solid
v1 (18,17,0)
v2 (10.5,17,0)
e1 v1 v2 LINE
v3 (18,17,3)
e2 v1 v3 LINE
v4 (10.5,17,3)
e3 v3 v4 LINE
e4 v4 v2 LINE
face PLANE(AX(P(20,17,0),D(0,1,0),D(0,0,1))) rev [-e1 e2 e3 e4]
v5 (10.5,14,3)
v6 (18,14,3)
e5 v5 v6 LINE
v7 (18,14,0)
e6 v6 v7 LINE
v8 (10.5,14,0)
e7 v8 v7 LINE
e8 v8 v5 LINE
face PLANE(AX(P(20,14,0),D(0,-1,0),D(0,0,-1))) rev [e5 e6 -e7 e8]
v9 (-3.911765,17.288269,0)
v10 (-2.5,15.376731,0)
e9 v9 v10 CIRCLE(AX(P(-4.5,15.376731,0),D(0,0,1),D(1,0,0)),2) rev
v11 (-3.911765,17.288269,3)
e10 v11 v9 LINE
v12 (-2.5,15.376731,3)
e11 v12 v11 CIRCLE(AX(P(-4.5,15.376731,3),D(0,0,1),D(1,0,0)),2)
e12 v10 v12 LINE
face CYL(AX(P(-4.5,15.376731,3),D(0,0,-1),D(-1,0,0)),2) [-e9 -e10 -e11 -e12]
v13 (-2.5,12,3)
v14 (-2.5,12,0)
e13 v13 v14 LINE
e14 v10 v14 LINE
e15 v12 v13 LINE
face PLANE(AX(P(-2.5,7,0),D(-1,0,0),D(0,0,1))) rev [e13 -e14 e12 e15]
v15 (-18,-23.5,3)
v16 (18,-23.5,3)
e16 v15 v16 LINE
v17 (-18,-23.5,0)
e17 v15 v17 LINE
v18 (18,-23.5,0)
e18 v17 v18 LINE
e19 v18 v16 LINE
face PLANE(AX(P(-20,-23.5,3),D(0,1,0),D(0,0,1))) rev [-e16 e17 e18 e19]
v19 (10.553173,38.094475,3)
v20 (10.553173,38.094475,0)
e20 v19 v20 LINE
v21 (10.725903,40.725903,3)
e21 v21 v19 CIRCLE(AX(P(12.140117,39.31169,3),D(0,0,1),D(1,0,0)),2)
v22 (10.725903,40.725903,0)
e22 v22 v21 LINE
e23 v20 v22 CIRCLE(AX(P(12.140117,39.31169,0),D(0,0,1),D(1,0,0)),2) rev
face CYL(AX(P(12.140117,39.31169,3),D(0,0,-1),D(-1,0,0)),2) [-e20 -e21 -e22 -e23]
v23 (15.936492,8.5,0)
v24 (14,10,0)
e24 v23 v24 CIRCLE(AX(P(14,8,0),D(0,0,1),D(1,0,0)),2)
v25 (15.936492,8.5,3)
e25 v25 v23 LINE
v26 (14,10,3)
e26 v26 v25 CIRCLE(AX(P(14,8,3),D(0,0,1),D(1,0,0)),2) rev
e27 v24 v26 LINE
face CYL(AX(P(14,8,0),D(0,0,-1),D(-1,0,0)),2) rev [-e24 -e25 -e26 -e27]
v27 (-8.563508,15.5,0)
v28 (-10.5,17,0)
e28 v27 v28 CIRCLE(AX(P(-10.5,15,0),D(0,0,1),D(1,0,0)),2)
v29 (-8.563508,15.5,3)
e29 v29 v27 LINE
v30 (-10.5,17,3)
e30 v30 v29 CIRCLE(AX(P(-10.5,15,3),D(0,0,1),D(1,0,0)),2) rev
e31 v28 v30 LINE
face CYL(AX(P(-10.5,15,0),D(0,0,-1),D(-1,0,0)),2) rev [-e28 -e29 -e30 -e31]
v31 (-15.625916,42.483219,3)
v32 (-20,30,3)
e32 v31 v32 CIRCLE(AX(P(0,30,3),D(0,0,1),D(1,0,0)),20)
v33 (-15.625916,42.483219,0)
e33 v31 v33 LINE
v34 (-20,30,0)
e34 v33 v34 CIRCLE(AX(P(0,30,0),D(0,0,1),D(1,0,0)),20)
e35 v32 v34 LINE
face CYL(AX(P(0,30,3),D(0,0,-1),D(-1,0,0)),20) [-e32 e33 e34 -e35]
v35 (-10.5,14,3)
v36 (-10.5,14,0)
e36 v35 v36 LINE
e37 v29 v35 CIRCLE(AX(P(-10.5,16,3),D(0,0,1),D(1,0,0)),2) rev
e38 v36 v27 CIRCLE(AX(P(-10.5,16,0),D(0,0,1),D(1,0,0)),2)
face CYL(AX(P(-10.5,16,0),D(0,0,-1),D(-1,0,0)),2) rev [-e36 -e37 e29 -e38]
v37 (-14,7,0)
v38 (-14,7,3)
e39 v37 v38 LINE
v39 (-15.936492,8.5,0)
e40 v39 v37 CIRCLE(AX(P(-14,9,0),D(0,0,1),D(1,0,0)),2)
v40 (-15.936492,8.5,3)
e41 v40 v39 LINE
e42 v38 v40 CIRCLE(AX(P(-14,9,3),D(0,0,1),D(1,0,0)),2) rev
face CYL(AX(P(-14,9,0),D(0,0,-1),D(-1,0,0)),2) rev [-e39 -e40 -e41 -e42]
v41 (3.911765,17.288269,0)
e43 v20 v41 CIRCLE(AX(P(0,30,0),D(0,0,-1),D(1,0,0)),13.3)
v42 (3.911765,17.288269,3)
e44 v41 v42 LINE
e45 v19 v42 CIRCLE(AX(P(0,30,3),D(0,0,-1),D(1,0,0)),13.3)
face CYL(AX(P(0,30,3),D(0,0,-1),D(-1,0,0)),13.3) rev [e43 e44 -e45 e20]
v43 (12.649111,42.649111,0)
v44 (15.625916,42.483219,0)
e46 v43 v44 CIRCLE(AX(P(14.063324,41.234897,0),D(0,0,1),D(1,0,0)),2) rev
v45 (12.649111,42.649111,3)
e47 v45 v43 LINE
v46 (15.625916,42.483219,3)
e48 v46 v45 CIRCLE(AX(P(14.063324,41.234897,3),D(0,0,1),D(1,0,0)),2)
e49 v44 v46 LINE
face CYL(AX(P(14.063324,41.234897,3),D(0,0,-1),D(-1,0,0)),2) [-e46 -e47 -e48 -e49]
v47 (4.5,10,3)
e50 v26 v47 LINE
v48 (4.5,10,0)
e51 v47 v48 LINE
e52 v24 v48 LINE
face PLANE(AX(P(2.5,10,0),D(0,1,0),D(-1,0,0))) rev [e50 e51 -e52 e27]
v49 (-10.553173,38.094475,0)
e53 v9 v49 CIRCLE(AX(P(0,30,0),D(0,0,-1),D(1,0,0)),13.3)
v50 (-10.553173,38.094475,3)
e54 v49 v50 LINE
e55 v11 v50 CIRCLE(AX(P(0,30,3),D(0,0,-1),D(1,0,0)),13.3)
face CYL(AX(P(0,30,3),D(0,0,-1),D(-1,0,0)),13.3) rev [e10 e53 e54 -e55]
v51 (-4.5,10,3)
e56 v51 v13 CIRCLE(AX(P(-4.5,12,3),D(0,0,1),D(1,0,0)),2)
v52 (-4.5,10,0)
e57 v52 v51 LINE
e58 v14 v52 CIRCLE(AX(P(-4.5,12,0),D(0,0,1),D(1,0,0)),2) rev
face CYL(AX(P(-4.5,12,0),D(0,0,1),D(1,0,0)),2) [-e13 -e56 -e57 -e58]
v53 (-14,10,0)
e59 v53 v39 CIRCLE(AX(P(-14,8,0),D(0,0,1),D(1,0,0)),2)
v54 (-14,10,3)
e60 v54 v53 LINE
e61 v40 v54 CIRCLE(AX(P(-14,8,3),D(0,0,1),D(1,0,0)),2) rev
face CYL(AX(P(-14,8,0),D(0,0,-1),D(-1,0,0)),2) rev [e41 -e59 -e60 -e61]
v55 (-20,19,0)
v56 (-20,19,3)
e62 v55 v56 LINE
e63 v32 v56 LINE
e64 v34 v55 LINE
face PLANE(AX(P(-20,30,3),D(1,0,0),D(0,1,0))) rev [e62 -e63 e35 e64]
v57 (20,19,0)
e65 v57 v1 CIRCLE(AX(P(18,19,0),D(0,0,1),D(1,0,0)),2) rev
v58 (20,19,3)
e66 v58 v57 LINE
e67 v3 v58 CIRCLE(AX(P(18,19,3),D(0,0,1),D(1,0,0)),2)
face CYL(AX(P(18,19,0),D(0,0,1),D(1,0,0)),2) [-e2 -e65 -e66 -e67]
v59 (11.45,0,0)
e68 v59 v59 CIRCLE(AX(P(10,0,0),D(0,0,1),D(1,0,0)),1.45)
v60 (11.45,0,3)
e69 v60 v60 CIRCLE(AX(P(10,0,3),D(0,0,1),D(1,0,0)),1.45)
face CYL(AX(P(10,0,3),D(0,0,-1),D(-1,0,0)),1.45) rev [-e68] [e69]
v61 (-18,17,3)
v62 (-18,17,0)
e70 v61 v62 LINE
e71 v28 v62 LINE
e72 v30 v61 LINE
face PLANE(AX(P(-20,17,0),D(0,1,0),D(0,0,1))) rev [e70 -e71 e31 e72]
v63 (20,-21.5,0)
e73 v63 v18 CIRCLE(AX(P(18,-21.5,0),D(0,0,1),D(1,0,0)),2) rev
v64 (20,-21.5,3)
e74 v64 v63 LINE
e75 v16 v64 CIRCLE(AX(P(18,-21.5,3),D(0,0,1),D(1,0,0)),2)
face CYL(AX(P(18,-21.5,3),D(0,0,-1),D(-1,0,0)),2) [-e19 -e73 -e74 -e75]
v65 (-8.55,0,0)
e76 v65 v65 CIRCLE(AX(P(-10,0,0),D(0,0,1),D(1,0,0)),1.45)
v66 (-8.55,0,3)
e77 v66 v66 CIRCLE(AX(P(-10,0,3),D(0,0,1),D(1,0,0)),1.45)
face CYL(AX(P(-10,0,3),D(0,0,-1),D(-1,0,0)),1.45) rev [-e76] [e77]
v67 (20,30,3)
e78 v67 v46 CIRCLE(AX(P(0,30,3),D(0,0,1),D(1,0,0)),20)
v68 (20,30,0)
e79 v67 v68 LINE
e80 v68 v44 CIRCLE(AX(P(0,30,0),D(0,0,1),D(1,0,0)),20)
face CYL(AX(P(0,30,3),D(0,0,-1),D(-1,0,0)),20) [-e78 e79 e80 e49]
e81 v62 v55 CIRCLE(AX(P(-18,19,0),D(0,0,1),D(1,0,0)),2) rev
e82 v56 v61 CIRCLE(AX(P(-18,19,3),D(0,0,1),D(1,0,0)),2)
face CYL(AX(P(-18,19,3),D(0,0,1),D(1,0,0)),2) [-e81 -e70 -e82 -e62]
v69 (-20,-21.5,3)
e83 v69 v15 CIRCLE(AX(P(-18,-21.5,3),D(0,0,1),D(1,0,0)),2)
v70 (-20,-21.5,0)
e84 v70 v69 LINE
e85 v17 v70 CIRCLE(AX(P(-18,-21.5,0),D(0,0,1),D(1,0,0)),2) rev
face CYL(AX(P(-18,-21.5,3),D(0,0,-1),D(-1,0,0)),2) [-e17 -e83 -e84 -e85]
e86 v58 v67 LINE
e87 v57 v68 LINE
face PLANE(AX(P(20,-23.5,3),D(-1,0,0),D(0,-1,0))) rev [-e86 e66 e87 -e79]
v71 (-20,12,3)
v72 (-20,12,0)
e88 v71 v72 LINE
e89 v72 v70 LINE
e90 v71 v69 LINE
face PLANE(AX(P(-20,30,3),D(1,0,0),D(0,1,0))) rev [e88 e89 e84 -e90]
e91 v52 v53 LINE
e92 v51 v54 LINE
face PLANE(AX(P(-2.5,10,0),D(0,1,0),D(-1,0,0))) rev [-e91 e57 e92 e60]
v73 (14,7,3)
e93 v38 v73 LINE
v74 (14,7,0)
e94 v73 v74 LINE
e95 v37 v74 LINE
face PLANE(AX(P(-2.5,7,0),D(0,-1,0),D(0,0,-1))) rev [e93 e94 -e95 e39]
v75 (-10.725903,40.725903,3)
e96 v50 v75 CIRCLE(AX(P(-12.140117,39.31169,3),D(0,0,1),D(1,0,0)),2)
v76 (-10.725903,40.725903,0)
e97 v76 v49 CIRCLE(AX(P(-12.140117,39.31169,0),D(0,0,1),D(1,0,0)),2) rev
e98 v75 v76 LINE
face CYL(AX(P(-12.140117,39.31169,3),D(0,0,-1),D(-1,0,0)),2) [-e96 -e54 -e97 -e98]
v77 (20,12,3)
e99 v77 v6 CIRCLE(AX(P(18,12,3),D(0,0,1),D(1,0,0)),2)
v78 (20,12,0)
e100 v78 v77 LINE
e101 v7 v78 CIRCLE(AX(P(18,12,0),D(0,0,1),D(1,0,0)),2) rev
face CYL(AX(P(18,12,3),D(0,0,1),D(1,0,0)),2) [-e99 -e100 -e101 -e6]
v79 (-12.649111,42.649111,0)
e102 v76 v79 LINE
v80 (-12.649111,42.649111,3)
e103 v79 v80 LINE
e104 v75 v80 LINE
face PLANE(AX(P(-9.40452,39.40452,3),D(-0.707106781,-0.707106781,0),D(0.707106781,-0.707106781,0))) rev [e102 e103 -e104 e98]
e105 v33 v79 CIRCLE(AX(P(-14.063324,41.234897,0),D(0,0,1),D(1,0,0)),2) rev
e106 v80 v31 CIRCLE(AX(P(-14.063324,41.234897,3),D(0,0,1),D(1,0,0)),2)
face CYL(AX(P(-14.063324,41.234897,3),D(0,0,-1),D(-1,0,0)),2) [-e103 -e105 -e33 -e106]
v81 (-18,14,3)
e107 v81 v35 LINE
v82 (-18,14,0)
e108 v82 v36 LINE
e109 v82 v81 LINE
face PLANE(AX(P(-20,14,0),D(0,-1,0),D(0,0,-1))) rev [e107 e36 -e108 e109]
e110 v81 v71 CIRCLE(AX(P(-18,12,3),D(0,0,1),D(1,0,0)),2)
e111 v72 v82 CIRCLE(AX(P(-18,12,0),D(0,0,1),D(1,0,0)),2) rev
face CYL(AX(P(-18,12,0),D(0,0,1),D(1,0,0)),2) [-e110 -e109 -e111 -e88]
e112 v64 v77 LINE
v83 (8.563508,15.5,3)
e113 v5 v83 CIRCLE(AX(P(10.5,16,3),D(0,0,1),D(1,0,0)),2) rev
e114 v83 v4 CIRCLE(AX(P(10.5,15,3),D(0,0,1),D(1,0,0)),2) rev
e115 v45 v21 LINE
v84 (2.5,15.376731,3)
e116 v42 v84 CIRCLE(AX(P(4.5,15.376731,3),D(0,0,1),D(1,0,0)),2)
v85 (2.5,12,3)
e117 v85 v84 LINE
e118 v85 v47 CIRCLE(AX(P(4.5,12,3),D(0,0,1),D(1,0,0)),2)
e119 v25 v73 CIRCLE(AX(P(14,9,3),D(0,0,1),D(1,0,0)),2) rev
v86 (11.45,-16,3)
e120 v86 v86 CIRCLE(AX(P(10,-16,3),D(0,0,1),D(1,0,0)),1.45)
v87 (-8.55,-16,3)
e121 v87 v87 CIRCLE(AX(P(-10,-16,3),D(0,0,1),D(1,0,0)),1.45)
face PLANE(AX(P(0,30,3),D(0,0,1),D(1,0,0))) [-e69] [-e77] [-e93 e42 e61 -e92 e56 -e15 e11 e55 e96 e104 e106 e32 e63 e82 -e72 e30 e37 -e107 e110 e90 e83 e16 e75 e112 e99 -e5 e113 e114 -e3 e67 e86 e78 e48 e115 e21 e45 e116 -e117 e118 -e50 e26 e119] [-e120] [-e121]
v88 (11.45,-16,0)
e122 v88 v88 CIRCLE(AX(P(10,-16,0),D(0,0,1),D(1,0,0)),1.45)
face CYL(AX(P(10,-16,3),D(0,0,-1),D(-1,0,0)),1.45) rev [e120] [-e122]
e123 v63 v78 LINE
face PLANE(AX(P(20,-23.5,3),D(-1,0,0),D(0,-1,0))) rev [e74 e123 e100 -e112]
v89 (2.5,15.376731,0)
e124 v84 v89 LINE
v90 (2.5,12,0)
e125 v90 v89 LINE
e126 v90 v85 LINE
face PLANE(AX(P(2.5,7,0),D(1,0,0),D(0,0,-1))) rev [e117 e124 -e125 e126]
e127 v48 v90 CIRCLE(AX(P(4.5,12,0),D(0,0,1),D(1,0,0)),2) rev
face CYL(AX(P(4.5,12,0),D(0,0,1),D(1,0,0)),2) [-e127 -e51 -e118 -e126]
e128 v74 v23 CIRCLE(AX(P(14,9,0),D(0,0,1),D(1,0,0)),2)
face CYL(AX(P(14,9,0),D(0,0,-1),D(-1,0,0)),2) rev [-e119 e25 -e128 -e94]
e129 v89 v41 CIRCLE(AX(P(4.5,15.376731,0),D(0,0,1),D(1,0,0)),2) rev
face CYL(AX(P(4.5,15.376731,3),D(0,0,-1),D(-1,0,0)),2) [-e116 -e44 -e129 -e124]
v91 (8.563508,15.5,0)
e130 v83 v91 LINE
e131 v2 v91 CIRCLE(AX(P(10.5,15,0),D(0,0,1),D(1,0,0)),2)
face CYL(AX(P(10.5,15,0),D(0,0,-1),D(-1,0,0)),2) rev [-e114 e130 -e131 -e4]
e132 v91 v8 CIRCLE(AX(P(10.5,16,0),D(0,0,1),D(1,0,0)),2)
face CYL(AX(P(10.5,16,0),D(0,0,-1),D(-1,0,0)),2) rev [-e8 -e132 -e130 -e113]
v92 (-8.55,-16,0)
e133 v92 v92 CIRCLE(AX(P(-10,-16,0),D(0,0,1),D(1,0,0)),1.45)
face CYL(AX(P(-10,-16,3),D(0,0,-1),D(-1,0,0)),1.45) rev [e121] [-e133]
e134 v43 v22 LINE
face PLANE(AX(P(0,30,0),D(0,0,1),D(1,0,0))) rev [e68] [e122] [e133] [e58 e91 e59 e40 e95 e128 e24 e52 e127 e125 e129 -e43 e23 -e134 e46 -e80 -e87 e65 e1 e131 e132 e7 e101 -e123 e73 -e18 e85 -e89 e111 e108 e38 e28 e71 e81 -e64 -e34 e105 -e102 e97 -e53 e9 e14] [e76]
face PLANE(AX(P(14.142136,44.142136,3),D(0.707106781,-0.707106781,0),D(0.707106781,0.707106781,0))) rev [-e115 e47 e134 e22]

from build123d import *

# Parameters (mm, degrees)
SKETCH_1_R          = 1.45
EXTRUDE_1_DEPTH     = 3
SKETCH_2_W          = 5
SKETCH_2_H          = 25
CUT_EXTRUDE_1_DEPTH = 49.554383298
SKETCH_3_W          = 11.5
SKETCH_3_H          = 3
SKETCH_3_W_2        = 13.5
CUT_EXTRUDE_2_DEPTH = 49.554383298
FILLET_1_R          = 2


with BuildPart() as part:
    # 草图1 → 凸台-拉伸1 (new body)
    with BuildSketch(Plane.XY):
        with BuildLine():
            Line((-9.40452019, 39.40452019), (-14.142135624, 44.142135624))
            ThreePointArc((-14.142135624, 44.142135624), (-18.47759065, 37.653668647), (-20, 30))
            Line((-20, 30), (-20, -23.5))
            Line((-20, -23.5), (20, -23.5))
            Line((20, -23.5), (20, 30))
            ThreePointArc((20, 30), (18.47759065, 37.653668647), (14.142135624, 44.142135624))
            Line((14.142135624, 44.142135624), (9.40452019, 39.40452019))
            ThreePointArc((9.40452019, 39.40452019), (0, 16.7), (-9.40452019, 39.40452019))
        make_face()
        with Locations((-10, 0)):
            Circle(SKETCH_1_R, mode=Mode.SUBTRACT)
        with Locations((10, 0)):
            Circle(SKETCH_1_R, mode=Mode.SUBTRACT)
        with Locations((-10, -16)):
            Circle(SKETCH_1_R, mode=Mode.SUBTRACT)
        with Locations((10, -16)):
            Circle(SKETCH_1_R, mode=Mode.SUBTRACT)
    extrude(amount=EXTRUDE_1_DEPTH)

    # 草图2 → 切除-拉伸1 (cut, through all)
    with BuildSketch(Plane.XY.offset(3)):
        with Locations((0, 19.5)):
            Rectangle(SKETCH_2_W, SKETCH_2_H)
    extrude(amount=-CUT_EXTRUDE_1_DEPTH, mode=Mode.SUBTRACT)

    # 草图3 → 切除-拉伸2 (cut, through all)
    with BuildSketch(Plane.XY.offset(3)):
        with Locations((-14.25, 15.5)):
            Rectangle(SKETCH_3_W, SKETCH_3_H)
        with Locations((-9.25, 8.5)):
            Rectangle(SKETCH_3_W_2, SKETCH_3_H)
        with Locations((9.25, 8.5)):
            Rectangle(SKETCH_3_W_2, SKETCH_3_H)
        with Locations((14.25, 15.5)):
            Rectangle(SKETCH_3_W, SKETCH_3_H)
    extrude(amount=-CUT_EXTRUDE_2_DEPTH, mode=Mode.SUBTRACT)

    # 圆角1
    # the kernel refuses this fillet: 2 mm, written as the material it adds along each edge
    with BuildSketch(Plane(origin=(8.5, 17, 3), x_dir=(1, 0, 0), z_dir=(0, 0, -1)), Plane(origin=(8.5, 14, 3), x_dir=(0, 1, 0), z_dir=(0, 0, -1)), Plane(origin=(-8.5, 14, 3), x_dir=(-1, 0, 0), z_dir=(0, 0, -1)), Plane(origin=(-8.5, 17, 3), x_dir=(0, -1, 0), z_dir=(0, 0, -1)), Plane(origin=(-16, 10, 3), x_dir=(1, 0, 0), z_dir=(0, 0, -1)), Plane(origin=(-16, 7, 3), x_dir=(0, 1, 0), z_dir=(0, 0, -1)), Plane(origin=(16, 7, 3), x_dir=(-1, 0, 0), z_dir=(0, 0, -1)), Plane(origin=(16, 10, 3), x_dir=(0, -1, 0), z_dir=(0, 0, -1))) as fillet_1_piece_1:
        with BuildLine():
            CenterArc((FILLET_1_R, FILLET_1_R), FILLET_1_R, 180, 90)
            Line((0, FILLET_1_R), (0, 0))
            Line((0, 0), (FILLET_1_R, 0))
        make_face()
    extrude(amount=3)
    # the kernel refuses this fillet: 2 mm, written as the material it takes off along each edge
    with BuildSketch(Plane(origin=(20, 14, 8), x_dir=(0, -1, 0), z_dir=(0, 0, -1)), Plane(origin=(-20, 14, 8), x_dir=(1, 0, 0), z_dir=(0, 0, -1)), Plane(origin=(-20, 17, 8), x_dir=(0, 1, 0), z_dir=(0, 0, -1)), Plane(origin=(-2.5, 10, 8), x_dir=(-1, 0, 0), z_dir=(0, 0, -1)), Plane(origin=(2.5, 10, 8), x_dir=(0, 1, 0), z_dir=(0, 0, -1)), Plane(origin=(20, 17, 8), x_dir=(-1, 0, 0), z_dir=(0, 0, -1))) as fillet_1_2_piece_1:
        with BuildLine():
            CenterArc((FILLET_1_R, FILLET_1_R), FILLET_1_R, 180, 90)
            Line((0, FILLET_1_R), (0, 0))
            Line((0, 0), (FILLET_1_R, 0))
        make_face()
    extrude(amount=13, mode=Mode.SUBTRACT)
    with BuildSketch(Plane(origin=(20, -23.5, -5), x_dir=(-1, 0, 0), z_dir=(0, 0, 1)), Plane(origin=(-20, -23.5, -5), x_dir=(0, 1, 0), z_dir=(0, 0, 1))) as fillet_1_2_piece_2:
        with BuildLine():
            CenterArc((FILLET_1_R, -FILLET_1_R), FILLET_1_R, 90, 90)
            Line((0, -FILLET_1_R), (0, 0))
            Line((0, 0), (FILLET_1_R, 0))
        make_face()
    extrude(amount=13, mode=Mode.SUBTRACT)
    with BuildSketch(Plane(origin=(-14.142135624, 44.142135624, -5.56417559), x_dir=(0.7071067811865518, -0.7071067811865434, 0), z_dir=(0, 0, 1))) as fillet_1_2_piece_3:
        with BuildLine():
            CenterArc((2.11145618, -2), FILLET_1_R, 90, 96.379370208)
            ThreePointArc((0.1238402, -2.222222222), (0.03098405, -1.112835118), (0, 0))
            Line((0, 0), (2.11145618, 0))
        make_face()
    extrude(amount=14.128351181, mode=Mode.SUBTRACT)
    with BuildSketch(Plane(origin=(-2.5, 16.937075366, 6.900861235), x_dir=(0, -1, 0), z_dir=(0, 0, -1))) as fillet_1_2_piece_4:
        with BuildLine():
            CenterArc((1.560344494, 2), FILLET_1_R, 197.104635177, 72.895364823)
            ThreePointArc((-0.351193954, 1.411764706), (-0.156279677, 0.71068777), (0, 0))
            Line((0, 0), (1.560344494, 0))
        make_face()
    extrude(amount=10.80172247, mode=Mode.SUBTRACT)
    with BuildSketch(Plane(origin=(2.5, 16.937075366, 6.900861235), x_dir=(0.9704244328417233, 0.2414050955216561, 0), z_dir=(0, 0, -1))) as fillet_1_2_piece_5:
        with BuildLine():
            CenterArc((1.564173754, 1.997006612), FILLET_1_R, 193.969485078, 72.895364823)
            Line((-0.376675112, 1.514196421), (0, 0))
            ThreePointArc((0, 0), (0.727395487, 0.019906032), (1.454790974, 0))
        make_face()
    extrude(amount=10.80172247, mode=Mode.SUBTRACT)
    with BuildSketch(Plane(origin=(9.40452019, 39.40452019, -4.671794525), x_dir=(0.6592727226844873, -0.7519039015221182, 0), z_dir=(0, 0, 1))) as fillet_1_2_piece_6:
        with BuildLine():
            CenterArc((1.873303853, 1.995705121), FILLET_1_R, 183.755569948, 82.488860105)
            Line((-0.122401268, 1.864704851), (0, 0))
            ThreePointArc((0, 0), (0.871151792, 0.028560946), (1.742303583, 0))
        make_face()
    extrude(amount=12.34358905, mode=Mode.SUBTRACT)
    with BuildSketch(Plane(origin=(14.142135624, 44.142135624, -5.56417559), x_dir=(-0.7071067811865467, -0.7071067811865483, 0), z_dir=(0, 0, 1))) as fillet_1_2_piece_7:
        with BuildLine():
            CenterArc((2.11145618, 2), FILLET_1_R, 173.620629792, 96.379370208)
            ThreePointArc((0.1238402, 2.222222222), (0.03098405, 1.112835118), (0, 0))
            Line((0, 0), (2.11145618, 0))
        make_face()
    extrude(amount=14.128351181, mode=Mode.SUBTRACT)
    with BuildSketch(Plane(origin=(-9.40452019, 39.40452019, -4.671794525), x_dir=(-0.659272722684483, -0.7519039015221219, 0), z_dir=(0, 0, 1))) as fillet_1_2_piece_8:
        with BuildLine():
            CenterArc((1.873303853, -1.995705121), FILLET_1_R, 93.755569948, 82.488860105)
            Line((-0.122401268, -1.864704851), (0, 0))
            ThreePointArc((0, 0), (0.871151792, -0.028560946), (1.742303583, 0))
        make_face()
    extrude(amount=12.34358905, mode=Mode.SUBTRACT)


solid = part.part
